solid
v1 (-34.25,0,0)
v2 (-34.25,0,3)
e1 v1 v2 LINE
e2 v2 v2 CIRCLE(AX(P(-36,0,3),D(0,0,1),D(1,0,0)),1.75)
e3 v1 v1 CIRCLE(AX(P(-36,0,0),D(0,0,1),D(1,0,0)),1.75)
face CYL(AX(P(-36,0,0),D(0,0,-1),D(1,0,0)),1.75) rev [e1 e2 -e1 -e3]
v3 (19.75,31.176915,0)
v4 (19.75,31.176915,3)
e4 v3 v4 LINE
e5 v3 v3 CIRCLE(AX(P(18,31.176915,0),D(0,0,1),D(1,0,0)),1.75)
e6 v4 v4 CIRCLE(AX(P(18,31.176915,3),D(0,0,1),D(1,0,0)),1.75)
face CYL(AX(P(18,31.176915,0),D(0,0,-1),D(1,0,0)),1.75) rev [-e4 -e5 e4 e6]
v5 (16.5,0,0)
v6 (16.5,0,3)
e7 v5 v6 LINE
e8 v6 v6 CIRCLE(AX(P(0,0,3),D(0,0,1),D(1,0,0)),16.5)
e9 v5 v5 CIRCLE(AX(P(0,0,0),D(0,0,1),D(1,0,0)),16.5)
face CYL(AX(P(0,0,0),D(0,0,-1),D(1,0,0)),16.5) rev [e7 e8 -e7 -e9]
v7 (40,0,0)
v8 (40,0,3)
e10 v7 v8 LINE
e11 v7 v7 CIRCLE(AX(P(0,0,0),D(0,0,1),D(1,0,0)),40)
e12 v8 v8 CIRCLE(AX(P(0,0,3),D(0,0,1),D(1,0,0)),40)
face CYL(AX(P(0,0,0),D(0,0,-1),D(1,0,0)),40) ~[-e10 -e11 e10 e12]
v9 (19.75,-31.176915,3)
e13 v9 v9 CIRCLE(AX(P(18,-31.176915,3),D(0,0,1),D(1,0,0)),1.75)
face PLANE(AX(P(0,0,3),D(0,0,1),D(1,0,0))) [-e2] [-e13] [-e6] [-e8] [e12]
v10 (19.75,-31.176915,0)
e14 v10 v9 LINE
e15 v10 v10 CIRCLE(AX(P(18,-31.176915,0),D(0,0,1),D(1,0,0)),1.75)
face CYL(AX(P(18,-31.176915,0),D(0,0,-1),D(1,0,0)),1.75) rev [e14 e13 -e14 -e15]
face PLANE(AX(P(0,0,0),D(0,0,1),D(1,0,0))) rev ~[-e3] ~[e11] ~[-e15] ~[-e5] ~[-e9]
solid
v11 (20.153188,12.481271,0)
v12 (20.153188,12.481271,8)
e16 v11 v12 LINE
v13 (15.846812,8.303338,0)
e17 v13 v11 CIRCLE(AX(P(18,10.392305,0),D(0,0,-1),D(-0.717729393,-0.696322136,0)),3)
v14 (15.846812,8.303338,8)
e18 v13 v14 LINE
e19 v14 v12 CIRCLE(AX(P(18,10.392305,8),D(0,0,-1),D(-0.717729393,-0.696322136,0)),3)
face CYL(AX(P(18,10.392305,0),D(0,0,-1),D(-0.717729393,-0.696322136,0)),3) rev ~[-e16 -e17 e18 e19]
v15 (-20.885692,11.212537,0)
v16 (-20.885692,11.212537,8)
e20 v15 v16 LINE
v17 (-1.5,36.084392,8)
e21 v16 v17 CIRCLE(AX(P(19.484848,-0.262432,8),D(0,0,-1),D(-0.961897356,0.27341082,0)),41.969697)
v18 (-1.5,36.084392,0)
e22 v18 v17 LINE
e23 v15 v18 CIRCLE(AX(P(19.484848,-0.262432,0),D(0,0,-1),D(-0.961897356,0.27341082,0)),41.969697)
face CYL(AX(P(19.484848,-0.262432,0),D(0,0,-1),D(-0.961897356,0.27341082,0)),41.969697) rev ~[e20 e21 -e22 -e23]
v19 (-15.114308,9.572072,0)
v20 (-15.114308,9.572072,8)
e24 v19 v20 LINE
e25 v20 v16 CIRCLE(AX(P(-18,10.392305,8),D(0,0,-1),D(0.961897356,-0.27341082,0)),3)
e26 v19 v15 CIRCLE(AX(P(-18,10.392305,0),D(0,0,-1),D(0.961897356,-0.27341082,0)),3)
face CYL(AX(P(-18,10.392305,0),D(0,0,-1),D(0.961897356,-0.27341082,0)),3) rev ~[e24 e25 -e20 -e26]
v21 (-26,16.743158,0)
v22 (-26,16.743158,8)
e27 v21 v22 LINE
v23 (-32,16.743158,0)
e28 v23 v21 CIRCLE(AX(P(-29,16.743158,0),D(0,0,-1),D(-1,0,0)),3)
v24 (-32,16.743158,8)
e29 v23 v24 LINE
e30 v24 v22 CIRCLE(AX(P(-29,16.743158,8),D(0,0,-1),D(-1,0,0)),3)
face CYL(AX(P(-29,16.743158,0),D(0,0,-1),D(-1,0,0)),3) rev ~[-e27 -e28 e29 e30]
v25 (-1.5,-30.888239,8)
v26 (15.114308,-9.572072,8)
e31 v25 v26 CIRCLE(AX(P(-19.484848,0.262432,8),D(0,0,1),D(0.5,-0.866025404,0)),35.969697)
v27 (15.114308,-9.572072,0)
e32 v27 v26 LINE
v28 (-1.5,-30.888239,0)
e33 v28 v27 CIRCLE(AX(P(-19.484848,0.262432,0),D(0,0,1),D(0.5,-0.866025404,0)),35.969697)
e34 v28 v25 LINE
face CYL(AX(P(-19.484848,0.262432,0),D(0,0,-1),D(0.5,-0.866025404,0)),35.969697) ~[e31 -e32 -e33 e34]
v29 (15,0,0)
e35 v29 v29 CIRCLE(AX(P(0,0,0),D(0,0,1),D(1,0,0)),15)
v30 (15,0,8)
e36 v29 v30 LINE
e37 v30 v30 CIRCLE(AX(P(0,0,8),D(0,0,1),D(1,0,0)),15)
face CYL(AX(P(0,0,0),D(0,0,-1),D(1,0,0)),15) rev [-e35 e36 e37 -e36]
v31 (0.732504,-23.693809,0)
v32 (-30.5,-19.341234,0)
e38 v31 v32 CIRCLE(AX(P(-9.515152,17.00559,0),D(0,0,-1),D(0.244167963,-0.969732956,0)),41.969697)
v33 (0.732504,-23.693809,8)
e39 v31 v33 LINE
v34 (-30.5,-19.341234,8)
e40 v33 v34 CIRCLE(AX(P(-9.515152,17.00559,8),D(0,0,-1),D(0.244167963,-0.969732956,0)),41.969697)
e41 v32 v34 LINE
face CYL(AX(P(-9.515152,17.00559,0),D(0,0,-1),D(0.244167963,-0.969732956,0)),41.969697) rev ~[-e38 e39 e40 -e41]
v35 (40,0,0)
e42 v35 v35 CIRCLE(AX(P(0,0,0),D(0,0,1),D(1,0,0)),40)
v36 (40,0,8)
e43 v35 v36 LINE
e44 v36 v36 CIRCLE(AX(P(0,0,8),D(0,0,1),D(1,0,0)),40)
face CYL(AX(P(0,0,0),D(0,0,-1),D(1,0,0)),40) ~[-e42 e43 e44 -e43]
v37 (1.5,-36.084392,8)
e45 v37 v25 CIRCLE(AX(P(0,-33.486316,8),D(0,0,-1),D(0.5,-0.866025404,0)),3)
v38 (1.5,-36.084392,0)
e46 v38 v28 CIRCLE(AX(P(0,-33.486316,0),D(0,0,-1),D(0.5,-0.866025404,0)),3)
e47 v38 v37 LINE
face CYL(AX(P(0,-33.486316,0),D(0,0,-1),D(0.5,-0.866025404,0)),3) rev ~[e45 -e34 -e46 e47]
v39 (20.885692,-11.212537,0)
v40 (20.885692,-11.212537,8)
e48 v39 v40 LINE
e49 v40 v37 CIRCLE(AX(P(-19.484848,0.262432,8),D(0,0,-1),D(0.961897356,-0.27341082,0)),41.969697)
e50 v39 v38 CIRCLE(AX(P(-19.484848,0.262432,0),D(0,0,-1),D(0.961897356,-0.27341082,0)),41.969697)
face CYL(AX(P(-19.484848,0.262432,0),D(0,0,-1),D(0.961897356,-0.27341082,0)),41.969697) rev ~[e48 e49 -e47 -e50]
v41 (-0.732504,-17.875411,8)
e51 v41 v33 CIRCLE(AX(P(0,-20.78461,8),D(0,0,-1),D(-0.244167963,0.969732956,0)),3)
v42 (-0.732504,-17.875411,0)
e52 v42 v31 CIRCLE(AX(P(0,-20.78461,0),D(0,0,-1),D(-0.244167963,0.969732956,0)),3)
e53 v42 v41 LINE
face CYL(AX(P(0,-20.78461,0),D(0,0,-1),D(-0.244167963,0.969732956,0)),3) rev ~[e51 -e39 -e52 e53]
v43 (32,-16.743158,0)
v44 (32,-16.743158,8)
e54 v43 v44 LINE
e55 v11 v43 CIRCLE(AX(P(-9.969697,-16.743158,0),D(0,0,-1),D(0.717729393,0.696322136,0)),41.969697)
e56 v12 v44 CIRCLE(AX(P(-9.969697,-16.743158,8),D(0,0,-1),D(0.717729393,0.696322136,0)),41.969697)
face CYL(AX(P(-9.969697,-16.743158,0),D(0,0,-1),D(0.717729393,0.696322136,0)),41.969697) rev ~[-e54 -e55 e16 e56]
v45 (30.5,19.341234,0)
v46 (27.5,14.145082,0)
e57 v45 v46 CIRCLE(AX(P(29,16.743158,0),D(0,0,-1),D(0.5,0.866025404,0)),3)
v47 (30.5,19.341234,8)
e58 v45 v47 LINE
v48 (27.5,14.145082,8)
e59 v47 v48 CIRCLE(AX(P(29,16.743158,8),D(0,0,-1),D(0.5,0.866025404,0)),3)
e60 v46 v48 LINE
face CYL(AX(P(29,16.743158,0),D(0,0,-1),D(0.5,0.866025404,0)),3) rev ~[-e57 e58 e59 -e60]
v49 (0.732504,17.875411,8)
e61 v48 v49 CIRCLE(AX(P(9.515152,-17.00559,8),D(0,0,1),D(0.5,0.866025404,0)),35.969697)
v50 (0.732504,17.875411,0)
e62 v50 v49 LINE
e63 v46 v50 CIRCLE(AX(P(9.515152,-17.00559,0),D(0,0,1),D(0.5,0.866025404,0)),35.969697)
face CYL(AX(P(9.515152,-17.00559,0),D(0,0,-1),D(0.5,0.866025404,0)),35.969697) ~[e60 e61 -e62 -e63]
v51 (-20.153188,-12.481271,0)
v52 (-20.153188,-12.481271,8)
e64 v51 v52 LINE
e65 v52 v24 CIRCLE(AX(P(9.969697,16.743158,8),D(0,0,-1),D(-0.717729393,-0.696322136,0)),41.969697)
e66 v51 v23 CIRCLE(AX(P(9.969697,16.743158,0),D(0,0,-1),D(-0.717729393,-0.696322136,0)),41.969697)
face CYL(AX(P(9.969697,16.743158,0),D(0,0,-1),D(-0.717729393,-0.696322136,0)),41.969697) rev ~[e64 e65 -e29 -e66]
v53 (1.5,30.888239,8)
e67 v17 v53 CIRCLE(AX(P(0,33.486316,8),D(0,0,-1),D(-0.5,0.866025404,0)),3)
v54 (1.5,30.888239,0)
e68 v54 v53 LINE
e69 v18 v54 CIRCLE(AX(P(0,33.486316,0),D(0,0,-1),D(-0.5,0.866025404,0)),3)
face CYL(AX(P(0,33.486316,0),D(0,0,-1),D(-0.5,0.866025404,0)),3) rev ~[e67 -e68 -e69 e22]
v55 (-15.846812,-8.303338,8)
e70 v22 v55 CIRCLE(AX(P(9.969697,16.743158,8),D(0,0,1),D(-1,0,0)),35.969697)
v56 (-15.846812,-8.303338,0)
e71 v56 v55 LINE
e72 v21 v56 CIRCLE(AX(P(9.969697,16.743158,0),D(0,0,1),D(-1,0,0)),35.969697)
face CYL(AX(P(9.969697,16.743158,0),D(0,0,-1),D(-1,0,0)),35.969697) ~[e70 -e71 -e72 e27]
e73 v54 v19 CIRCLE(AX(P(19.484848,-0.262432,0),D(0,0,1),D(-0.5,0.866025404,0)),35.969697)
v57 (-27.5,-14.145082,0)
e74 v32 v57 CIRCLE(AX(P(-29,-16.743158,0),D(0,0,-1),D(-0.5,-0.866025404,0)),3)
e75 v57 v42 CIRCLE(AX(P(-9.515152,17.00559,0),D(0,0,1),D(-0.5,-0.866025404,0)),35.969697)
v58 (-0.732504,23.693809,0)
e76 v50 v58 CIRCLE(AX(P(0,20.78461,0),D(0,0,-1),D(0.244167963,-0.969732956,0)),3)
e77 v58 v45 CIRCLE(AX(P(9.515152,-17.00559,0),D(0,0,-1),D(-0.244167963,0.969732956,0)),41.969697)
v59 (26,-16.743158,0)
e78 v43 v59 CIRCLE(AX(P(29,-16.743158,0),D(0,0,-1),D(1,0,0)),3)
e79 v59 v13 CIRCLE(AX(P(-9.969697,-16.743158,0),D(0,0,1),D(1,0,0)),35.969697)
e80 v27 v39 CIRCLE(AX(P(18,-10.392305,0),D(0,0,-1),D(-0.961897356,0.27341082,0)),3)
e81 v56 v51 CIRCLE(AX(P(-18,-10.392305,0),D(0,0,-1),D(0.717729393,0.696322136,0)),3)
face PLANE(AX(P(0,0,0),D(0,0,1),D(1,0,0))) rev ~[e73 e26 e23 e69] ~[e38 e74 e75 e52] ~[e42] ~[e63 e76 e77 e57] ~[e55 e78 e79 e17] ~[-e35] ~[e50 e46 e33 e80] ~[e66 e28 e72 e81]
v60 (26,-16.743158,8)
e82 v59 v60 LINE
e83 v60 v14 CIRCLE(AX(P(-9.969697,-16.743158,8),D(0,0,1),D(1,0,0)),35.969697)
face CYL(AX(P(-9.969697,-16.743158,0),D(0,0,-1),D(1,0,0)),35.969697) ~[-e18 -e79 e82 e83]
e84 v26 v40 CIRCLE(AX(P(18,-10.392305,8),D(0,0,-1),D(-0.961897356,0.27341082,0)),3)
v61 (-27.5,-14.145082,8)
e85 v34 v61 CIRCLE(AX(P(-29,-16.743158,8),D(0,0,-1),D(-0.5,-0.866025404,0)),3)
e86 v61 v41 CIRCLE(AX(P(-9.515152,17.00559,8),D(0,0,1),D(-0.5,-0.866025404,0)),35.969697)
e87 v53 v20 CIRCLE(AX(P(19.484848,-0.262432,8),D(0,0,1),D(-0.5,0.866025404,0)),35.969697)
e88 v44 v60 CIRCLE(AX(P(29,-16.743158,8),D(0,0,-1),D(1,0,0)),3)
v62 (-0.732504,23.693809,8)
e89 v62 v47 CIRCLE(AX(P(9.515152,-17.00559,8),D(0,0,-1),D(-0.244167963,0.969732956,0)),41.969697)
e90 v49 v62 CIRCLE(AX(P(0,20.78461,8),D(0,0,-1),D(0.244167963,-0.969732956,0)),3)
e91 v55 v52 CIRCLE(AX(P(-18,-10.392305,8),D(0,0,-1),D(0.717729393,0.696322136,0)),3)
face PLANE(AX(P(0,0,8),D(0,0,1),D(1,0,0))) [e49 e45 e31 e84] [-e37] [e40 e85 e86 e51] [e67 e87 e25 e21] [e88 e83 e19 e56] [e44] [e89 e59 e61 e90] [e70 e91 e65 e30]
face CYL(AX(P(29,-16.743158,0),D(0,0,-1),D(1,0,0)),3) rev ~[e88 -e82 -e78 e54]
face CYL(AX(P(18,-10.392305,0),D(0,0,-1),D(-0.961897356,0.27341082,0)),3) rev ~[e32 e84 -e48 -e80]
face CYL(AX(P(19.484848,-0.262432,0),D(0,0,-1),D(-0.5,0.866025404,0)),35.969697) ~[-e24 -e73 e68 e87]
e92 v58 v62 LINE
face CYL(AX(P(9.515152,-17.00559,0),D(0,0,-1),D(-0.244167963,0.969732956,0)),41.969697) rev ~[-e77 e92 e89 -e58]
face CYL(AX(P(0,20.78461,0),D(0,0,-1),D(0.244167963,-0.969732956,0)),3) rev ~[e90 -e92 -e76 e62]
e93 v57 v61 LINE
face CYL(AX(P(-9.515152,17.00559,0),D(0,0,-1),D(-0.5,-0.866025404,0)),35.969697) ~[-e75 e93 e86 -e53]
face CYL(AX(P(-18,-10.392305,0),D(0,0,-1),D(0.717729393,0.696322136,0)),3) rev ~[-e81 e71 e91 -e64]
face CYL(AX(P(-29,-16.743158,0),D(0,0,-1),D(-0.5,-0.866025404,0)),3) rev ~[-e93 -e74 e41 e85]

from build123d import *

# Parameters (mm, degrees)
F0_R     = 40
F0_R_2   = 15
F1_DEPTH = 8
F2_R     = 40
F2_R_2   = 1.75
F2_R_3   = 16.5
F3_DEPTH = 3


with BuildPart() as f1:
    # F0 (on Top) → F1 (new body)
    with BuildSketch(Plane.XY):
        Circle(F0_R)
        with BuildLine():
            ThreePointArc((0.732503888, -23.6938085589), (-15.3080829926, -24.5623956339), (-30.5, -19.3412340179))
            ThreePointArc((-30.5, -19.3412340179), (-31.5980762114, -15.2431578065), (-27.5, -14.1450815951))
            ThreePointArc((-27.5, -14.1450815951), (-14.4799238355, -18.6198244386), (-0.732503888, -17.8754108227))
            ThreePointArc((-0.732503888, -17.8754108227), (2.9091988681, -20.0521058028), (0.732503888, -23.6938085589))
        make_face(mode=Mode.SUBTRACT)
        with BuildLine():
            ThreePointArc((20.8856920684, -11.2125373041), (13.6176171004, -25.5383865717), (1.5, -36.0843918244))
            ThreePointArc((1.5, -36.0843918244), (-2.5980762114, -34.986315613), (-1.5, -30.8882394016))
            ThreePointArc((-1.5, -30.8882394016), (8.8852790601, -21.8498941057), (15.1143079316, -9.5720723868))
            ThreePointArc((15.1143079316, -9.5720723868), (18.8202324586, -7.506612777), (20.8856920684, -11.2125373041))
        make_face(mode=Mode.SUBTRACT)
        with BuildLine():
            ThreePointArc((20.1531881804, 12.4812712549), (28.925700093, -0.9759909379), (32, -16.7431578065))
            ThreePointArc((32, -16.7431578065), (29, -19.7431578065), (26, -16.7431578065))
            ThreePointArc((26, -16.7431578065), (23.3652028956, -3.2300696671), (15.8468118196, 8.303338436))
            ThreePointArc((15.8468118196, 8.303338436), (15.9110335906, 12.5454930258), (20.1531881804, 12.4812712549))
        make_face(mode=Mode.SUBTRACT)
        with BuildLine():
            ThreePointArc((-20.1531881804, -12.4812712549), (-28.925700093, 0.9759909379), (-32, 16.7431578065))
            ThreePointArc((-32, 16.7431578065), (-29, 19.7431578065), (-26, 16.7431578065))
            ThreePointArc((-26, 16.7431578065), (-23.3652028956, 3.2300696671), (-15.8468118196, -8.303338436))
            ThreePointArc((-15.8468118196, -8.303338436), (-15.9110335906, -12.5454930258), (-20.1531881804, -12.4812712549))
        make_face(mode=Mode.SUBTRACT)
        with BuildLine():
            ThreePointArc((-20.8856920684, 11.2125373041), (-13.6176171004, 25.5383865717), (-1.5, 36.0843918244))
            ThreePointArc((-1.5, 36.0843918244), (2.5980762114, 34.986315613), (1.5, 30.8882394016))
            ThreePointArc((1.5, 30.8882394016), (-8.8852790601, 21.8498941057), (-15.1143079316, 9.5720723868))
            ThreePointArc((-15.1143079316, 9.5720723868), (-18.8202324586, 7.506612777), (-20.8856920684, 11.2125373041))
        make_face(mode=Mode.SUBTRACT)
        Circle(F0_R_2, mode=Mode.SUBTRACT)
        with BuildLine():
            ThreePointArc((-0.732503888, 23.6938085589), (15.3080829926, 24.5623956339), (30.5, 19.3412340179))
            ThreePointArc((30.5, 19.3412340179), (31.5980762114, 15.2431578065), (27.5, 14.1450815951))
            ThreePointArc((27.5, 14.1450815951), (14.4799238355, 18.6198244386), (0.732503888, 17.8754108227))
            ThreePointArc((0.732503888, 17.8754108227), (-2.9091988681, 20.0521058028), (-0.732503888, 23.6938085589))
        make_face(mode=Mode.SUBTRACT)
    extrude(amount=F1_DEPTH)


with BuildPart() as f3:
    # F2 (on Top) → F3 (new body)
    with BuildSketch(Plane.XY):
        Circle(F2_R)
        with Locations((18, -31.1769145362)):
            Circle(F2_R_2, mode=Mode.SUBTRACT)
        with Locations((-36, 0)):
            Circle(F2_R_2, mode=Mode.SUBTRACT)
        Circle(F2_R_3, mode=Mode.SUBTRACT)
        with Locations((18, 31.1769145362)):
            Circle(F2_R_2, mode=Mode.SUBTRACT)
    extrude(amount=F3_DEPTH)


solid = Compound([f1.part, f3.part])
